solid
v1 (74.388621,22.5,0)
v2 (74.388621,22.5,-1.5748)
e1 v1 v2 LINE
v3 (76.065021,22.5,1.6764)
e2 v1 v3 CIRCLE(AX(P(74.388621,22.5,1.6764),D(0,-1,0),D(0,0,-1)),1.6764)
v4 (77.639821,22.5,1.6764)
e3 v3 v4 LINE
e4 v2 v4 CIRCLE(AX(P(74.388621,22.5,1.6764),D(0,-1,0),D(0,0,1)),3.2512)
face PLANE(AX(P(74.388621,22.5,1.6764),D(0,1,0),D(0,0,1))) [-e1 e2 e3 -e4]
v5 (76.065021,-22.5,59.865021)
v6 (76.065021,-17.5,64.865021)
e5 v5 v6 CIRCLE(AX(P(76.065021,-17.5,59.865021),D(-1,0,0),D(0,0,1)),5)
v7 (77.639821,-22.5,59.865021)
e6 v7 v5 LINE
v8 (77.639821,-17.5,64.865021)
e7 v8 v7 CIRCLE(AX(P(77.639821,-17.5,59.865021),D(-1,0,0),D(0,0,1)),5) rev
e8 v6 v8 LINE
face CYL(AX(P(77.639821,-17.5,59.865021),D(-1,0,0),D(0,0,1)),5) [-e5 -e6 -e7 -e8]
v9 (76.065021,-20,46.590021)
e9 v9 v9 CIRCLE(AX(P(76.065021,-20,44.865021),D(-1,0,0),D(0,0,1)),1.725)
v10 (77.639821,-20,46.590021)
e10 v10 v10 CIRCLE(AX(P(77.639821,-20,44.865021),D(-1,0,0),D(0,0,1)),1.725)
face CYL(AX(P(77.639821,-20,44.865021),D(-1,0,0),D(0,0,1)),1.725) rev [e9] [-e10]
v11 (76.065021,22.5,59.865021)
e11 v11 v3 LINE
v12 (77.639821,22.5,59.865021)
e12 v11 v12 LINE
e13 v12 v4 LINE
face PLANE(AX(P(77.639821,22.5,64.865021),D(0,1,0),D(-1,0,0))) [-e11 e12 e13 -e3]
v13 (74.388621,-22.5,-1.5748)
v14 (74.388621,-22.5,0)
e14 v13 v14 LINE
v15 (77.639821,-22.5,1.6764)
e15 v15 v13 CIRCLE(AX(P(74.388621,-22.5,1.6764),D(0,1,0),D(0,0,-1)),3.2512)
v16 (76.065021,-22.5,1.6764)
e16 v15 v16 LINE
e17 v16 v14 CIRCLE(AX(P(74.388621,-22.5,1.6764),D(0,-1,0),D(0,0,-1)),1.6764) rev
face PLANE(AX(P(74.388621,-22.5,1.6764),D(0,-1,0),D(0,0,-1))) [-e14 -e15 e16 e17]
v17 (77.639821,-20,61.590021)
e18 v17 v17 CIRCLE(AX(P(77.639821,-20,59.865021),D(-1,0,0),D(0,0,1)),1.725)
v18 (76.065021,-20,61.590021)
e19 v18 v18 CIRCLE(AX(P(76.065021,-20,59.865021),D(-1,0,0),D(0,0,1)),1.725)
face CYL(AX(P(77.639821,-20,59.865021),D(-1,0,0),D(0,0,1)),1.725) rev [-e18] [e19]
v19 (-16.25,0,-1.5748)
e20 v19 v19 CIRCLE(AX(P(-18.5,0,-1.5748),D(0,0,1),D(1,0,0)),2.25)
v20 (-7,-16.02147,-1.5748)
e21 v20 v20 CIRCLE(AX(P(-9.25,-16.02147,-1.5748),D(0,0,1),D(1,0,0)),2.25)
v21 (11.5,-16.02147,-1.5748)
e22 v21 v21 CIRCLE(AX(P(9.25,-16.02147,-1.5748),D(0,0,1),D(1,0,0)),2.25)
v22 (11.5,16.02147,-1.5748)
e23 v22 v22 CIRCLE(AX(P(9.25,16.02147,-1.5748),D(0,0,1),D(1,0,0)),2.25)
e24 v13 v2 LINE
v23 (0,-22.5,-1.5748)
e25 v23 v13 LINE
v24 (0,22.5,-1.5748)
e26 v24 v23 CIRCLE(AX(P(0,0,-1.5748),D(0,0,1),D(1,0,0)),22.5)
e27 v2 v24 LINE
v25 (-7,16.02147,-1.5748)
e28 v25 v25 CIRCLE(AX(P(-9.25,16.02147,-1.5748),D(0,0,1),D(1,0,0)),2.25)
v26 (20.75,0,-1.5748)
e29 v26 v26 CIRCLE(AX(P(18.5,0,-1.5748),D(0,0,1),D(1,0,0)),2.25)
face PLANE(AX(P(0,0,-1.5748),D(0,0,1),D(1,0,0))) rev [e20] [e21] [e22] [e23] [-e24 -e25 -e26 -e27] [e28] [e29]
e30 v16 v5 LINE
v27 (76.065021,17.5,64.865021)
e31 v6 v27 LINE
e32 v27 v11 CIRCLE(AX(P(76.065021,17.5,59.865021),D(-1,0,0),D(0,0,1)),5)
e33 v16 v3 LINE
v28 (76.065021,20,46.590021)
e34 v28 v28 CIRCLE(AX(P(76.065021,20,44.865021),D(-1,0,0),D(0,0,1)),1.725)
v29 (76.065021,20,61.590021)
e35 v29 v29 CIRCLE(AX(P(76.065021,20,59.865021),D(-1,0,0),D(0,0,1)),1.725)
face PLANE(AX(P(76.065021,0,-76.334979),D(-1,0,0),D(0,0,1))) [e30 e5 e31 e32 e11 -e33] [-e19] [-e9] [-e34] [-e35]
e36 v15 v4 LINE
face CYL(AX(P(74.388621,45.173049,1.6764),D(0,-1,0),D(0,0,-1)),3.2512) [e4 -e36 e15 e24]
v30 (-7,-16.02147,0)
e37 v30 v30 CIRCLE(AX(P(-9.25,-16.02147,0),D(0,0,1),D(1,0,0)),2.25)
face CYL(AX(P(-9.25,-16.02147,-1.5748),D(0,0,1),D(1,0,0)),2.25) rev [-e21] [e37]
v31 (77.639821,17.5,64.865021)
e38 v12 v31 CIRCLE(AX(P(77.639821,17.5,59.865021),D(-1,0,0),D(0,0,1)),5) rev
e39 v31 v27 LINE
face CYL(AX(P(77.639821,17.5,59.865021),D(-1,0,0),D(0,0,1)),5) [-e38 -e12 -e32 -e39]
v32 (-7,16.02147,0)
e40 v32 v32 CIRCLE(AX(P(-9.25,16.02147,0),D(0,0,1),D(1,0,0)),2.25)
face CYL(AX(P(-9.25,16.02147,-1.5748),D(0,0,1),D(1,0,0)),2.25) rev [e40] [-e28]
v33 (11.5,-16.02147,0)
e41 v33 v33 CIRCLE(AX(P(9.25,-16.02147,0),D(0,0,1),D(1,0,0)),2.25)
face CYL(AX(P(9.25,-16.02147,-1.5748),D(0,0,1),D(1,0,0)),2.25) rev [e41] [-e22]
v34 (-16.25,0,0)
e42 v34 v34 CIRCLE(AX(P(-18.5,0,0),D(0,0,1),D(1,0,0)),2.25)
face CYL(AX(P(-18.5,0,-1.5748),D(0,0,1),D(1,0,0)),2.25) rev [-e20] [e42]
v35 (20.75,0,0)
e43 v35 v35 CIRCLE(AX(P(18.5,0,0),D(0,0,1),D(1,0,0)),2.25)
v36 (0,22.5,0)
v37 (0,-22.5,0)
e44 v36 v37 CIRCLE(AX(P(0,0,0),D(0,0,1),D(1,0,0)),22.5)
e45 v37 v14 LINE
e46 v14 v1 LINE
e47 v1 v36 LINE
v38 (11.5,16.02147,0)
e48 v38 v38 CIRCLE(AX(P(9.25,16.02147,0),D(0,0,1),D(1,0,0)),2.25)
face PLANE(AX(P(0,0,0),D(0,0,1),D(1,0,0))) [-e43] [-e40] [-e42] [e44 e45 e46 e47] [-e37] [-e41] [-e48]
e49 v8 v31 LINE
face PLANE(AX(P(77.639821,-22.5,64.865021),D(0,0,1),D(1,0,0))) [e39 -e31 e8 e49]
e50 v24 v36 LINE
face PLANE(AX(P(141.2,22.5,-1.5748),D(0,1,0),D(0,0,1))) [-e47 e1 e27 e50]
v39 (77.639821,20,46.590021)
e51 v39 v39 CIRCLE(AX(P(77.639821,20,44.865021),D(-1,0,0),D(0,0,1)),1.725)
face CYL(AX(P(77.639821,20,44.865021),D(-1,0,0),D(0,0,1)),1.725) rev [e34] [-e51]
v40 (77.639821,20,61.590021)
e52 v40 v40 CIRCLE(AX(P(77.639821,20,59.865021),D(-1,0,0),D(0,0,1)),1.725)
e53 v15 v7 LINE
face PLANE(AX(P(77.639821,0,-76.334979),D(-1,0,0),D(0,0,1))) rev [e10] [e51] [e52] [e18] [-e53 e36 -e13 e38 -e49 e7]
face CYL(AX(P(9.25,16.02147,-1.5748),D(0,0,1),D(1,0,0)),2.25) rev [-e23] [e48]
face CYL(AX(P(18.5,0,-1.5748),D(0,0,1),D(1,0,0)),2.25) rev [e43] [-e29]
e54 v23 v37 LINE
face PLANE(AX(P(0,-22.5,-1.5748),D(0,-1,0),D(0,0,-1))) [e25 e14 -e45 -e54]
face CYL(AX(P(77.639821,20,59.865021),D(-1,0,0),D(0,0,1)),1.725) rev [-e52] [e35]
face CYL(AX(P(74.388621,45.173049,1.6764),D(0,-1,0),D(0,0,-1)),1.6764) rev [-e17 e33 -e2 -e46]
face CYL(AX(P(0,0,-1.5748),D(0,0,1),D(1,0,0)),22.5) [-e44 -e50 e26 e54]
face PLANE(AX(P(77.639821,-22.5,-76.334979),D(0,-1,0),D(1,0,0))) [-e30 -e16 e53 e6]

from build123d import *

# Parameters (mm, degrees)
SKETCH1_R                  = 2.25
SKETCH1_R_2                = 1.725
BASE_FLANGE1_DEPTH         = 1.5748
SKETCHED_START             = 77.296428764
SKETCHED_BEND1_OUTLINE_W   = 45
SKETCHED_BEND1_OUTLINE_H   = 1.5748
SKETCHED_BEND1_DEPTH       = 63.903571236
SKETCHED_START_2           = 74.388620508
SKETCHED_BEND1_2_OUTLINE_W = 45
SKETCHED_BEND1_2_OUTLINE_H = 64.865020508
SKETCHED_BEND1_2_OUTLINE_R = 1.725
SKETCHED_BEND1_2_DEPTH     = 3.2512
SKETCHED_START_3           = -22.5
SKETCHED_BEND1_3_DEPTH     = 45
FILLET1_R                  = 5


with BuildPart() as part:
    # Base-Flange1: sheet metal written as solids
    # Sketch1 → Base-Flange1 (new body)
    with BuildSketch(Plane.XY):
        with BuildLine():
            Line((0, -22.5), (141.2, -22.5))
            Line((141.2, -22.5), (141.2, 22.5))
            Line((141.2, 22.5), (0, 22.5))
            ThreePointArc((0, 22.5), (-22.5, 0), (0, -22.5))
        make_face()
        with Locations((9.25, 16.02146997)):
            Circle(SKETCH1_R, mode=Mode.SUBTRACT)
        with Locations((18.5, 0)):
            Circle(SKETCH1_R, mode=Mode.SUBTRACT)
        with Locations((9.25, -16.02146997)):
            Circle(SKETCH1_R, mode=Mode.SUBTRACT)
        with Locations((-9.25, -16.02146997)):
            Circle(SKETCH1_R, mode=Mode.SUBTRACT)
        with Locations((-18.5, 0)):
            Circle(SKETCH1_R, mode=Mode.SUBTRACT)
        with Locations((-9.25, 16.02146997)):
            Circle(SKETCH1_R, mode=Mode.SUBTRACT)
        with Locations((121.2, 20)):
            Circle(SKETCH1_R_2, mode=Mode.SUBTRACT)
        with Locations((136.2, 20)):
            Circle(SKETCH1_R_2, mode=Mode.SUBTRACT)
        with Locations((136.2, -20)):
            Circle(SKETCH1_R_2, mode=Mode.SUBTRACT)
        with Locations((121.2, -20)):
            Circle(SKETCH1_R_2, mode=Mode.SUBTRACT)
    extrude(amount=-BASE_FLANGE1_DEPTH)

    # Sketched Bend1: read off the stored shape, not the designer's step
    # Sketched Bend1 outline → Sketched Bend1 (cut)
    with BuildSketch(Plane.YZ.offset(SKETCHED_START)):
        with Locations((0, -0.7874)):
            Rectangle(SKETCHED_BEND1_OUTLINE_W, SKETCHED_BEND1_OUTLINE_H)
    extrude(amount=SKETCHED_BEND1_DEPTH, mode=Mode.SUBTRACT)

    # Sketched Bend1 2 outline → Sketched Bend1 2 (add)
    with BuildSketch(Plane.YZ.offset(SKETCHED_START_2)):
        with Locations((0, 32.432510254)):
            Rectangle(SKETCHED_BEND1_2_OUTLINE_W, SKETCHED_BEND1_2_OUTLINE_H)
        with Locations((-20, 44.865020508)):
            Circle(SKETCHED_BEND1_2_OUTLINE_R, mode=Mode.SUBTRACT)
        with Locations((-20, 59.865020508)):
            Circle(SKETCHED_BEND1_2_OUTLINE_R, mode=Mode.SUBTRACT)
        with Locations((20, 44.865020508)):
            Circle(SKETCHED_BEND1_2_OUTLINE_R, mode=Mode.SUBTRACT)
        with Locations((20, 59.865020508)):
            Circle(SKETCHED_BEND1_2_OUTLINE_R, mode=Mode.SUBTRACT)
    extrude(amount=SKETCHED_BEND1_2_DEPTH)

    # Sketched Bend1 3 outline → Sketched Bend1 3 (cut)
    with BuildSketch(Plane(origin=(0, 0, 0), x_dir=(1, 0, 0), z_dir=(0, 1, 0)).offset(SKETCHED_START_3)):
        with BuildLine():
            ThreePointArc((74.388620508, 1.5748), (76.687566075, 0.622545567), (77.639820508, -1.6764))
            Line((77.639820508, -1.6764), (77.639820508, 0))
            Line((77.639820508, 0), (77.296428764, 0))
            Line((77.296428764, 0), (77.296428764, 1.5748))
            Line((77.296428764, 1.5748), (74.388620508, 1.5748))
        make_face()
        with BuildLine():
            Line((76.065020508, -64.865020508), (76.065020508, -1.6764))
            ThreePointArc((76.065020508, -1.6764), (75.574014316, -0.491006192), (74.388620508, 0))
            Line((74.388620508, 0), (74.388620508, -64.865020508))
            Line((74.388620508, -64.865020508), (76.065020508, -64.865020508))
        make_face()
    extrude(amount=SKETCHED_BEND1_3_DEPTH, mode=Mode.SUBTRACT)

    # Fillet1
    fillet1_edges = [part.edges().sort_by_distance(p)[0] for p in [
        (76.852420508, 22.5, 64.865020508),
        (76.852420508, -22.5, 64.865020508),
    ]]
    fillet(fillet1_edges, radius=FILLET1_R)


solid = part.part
